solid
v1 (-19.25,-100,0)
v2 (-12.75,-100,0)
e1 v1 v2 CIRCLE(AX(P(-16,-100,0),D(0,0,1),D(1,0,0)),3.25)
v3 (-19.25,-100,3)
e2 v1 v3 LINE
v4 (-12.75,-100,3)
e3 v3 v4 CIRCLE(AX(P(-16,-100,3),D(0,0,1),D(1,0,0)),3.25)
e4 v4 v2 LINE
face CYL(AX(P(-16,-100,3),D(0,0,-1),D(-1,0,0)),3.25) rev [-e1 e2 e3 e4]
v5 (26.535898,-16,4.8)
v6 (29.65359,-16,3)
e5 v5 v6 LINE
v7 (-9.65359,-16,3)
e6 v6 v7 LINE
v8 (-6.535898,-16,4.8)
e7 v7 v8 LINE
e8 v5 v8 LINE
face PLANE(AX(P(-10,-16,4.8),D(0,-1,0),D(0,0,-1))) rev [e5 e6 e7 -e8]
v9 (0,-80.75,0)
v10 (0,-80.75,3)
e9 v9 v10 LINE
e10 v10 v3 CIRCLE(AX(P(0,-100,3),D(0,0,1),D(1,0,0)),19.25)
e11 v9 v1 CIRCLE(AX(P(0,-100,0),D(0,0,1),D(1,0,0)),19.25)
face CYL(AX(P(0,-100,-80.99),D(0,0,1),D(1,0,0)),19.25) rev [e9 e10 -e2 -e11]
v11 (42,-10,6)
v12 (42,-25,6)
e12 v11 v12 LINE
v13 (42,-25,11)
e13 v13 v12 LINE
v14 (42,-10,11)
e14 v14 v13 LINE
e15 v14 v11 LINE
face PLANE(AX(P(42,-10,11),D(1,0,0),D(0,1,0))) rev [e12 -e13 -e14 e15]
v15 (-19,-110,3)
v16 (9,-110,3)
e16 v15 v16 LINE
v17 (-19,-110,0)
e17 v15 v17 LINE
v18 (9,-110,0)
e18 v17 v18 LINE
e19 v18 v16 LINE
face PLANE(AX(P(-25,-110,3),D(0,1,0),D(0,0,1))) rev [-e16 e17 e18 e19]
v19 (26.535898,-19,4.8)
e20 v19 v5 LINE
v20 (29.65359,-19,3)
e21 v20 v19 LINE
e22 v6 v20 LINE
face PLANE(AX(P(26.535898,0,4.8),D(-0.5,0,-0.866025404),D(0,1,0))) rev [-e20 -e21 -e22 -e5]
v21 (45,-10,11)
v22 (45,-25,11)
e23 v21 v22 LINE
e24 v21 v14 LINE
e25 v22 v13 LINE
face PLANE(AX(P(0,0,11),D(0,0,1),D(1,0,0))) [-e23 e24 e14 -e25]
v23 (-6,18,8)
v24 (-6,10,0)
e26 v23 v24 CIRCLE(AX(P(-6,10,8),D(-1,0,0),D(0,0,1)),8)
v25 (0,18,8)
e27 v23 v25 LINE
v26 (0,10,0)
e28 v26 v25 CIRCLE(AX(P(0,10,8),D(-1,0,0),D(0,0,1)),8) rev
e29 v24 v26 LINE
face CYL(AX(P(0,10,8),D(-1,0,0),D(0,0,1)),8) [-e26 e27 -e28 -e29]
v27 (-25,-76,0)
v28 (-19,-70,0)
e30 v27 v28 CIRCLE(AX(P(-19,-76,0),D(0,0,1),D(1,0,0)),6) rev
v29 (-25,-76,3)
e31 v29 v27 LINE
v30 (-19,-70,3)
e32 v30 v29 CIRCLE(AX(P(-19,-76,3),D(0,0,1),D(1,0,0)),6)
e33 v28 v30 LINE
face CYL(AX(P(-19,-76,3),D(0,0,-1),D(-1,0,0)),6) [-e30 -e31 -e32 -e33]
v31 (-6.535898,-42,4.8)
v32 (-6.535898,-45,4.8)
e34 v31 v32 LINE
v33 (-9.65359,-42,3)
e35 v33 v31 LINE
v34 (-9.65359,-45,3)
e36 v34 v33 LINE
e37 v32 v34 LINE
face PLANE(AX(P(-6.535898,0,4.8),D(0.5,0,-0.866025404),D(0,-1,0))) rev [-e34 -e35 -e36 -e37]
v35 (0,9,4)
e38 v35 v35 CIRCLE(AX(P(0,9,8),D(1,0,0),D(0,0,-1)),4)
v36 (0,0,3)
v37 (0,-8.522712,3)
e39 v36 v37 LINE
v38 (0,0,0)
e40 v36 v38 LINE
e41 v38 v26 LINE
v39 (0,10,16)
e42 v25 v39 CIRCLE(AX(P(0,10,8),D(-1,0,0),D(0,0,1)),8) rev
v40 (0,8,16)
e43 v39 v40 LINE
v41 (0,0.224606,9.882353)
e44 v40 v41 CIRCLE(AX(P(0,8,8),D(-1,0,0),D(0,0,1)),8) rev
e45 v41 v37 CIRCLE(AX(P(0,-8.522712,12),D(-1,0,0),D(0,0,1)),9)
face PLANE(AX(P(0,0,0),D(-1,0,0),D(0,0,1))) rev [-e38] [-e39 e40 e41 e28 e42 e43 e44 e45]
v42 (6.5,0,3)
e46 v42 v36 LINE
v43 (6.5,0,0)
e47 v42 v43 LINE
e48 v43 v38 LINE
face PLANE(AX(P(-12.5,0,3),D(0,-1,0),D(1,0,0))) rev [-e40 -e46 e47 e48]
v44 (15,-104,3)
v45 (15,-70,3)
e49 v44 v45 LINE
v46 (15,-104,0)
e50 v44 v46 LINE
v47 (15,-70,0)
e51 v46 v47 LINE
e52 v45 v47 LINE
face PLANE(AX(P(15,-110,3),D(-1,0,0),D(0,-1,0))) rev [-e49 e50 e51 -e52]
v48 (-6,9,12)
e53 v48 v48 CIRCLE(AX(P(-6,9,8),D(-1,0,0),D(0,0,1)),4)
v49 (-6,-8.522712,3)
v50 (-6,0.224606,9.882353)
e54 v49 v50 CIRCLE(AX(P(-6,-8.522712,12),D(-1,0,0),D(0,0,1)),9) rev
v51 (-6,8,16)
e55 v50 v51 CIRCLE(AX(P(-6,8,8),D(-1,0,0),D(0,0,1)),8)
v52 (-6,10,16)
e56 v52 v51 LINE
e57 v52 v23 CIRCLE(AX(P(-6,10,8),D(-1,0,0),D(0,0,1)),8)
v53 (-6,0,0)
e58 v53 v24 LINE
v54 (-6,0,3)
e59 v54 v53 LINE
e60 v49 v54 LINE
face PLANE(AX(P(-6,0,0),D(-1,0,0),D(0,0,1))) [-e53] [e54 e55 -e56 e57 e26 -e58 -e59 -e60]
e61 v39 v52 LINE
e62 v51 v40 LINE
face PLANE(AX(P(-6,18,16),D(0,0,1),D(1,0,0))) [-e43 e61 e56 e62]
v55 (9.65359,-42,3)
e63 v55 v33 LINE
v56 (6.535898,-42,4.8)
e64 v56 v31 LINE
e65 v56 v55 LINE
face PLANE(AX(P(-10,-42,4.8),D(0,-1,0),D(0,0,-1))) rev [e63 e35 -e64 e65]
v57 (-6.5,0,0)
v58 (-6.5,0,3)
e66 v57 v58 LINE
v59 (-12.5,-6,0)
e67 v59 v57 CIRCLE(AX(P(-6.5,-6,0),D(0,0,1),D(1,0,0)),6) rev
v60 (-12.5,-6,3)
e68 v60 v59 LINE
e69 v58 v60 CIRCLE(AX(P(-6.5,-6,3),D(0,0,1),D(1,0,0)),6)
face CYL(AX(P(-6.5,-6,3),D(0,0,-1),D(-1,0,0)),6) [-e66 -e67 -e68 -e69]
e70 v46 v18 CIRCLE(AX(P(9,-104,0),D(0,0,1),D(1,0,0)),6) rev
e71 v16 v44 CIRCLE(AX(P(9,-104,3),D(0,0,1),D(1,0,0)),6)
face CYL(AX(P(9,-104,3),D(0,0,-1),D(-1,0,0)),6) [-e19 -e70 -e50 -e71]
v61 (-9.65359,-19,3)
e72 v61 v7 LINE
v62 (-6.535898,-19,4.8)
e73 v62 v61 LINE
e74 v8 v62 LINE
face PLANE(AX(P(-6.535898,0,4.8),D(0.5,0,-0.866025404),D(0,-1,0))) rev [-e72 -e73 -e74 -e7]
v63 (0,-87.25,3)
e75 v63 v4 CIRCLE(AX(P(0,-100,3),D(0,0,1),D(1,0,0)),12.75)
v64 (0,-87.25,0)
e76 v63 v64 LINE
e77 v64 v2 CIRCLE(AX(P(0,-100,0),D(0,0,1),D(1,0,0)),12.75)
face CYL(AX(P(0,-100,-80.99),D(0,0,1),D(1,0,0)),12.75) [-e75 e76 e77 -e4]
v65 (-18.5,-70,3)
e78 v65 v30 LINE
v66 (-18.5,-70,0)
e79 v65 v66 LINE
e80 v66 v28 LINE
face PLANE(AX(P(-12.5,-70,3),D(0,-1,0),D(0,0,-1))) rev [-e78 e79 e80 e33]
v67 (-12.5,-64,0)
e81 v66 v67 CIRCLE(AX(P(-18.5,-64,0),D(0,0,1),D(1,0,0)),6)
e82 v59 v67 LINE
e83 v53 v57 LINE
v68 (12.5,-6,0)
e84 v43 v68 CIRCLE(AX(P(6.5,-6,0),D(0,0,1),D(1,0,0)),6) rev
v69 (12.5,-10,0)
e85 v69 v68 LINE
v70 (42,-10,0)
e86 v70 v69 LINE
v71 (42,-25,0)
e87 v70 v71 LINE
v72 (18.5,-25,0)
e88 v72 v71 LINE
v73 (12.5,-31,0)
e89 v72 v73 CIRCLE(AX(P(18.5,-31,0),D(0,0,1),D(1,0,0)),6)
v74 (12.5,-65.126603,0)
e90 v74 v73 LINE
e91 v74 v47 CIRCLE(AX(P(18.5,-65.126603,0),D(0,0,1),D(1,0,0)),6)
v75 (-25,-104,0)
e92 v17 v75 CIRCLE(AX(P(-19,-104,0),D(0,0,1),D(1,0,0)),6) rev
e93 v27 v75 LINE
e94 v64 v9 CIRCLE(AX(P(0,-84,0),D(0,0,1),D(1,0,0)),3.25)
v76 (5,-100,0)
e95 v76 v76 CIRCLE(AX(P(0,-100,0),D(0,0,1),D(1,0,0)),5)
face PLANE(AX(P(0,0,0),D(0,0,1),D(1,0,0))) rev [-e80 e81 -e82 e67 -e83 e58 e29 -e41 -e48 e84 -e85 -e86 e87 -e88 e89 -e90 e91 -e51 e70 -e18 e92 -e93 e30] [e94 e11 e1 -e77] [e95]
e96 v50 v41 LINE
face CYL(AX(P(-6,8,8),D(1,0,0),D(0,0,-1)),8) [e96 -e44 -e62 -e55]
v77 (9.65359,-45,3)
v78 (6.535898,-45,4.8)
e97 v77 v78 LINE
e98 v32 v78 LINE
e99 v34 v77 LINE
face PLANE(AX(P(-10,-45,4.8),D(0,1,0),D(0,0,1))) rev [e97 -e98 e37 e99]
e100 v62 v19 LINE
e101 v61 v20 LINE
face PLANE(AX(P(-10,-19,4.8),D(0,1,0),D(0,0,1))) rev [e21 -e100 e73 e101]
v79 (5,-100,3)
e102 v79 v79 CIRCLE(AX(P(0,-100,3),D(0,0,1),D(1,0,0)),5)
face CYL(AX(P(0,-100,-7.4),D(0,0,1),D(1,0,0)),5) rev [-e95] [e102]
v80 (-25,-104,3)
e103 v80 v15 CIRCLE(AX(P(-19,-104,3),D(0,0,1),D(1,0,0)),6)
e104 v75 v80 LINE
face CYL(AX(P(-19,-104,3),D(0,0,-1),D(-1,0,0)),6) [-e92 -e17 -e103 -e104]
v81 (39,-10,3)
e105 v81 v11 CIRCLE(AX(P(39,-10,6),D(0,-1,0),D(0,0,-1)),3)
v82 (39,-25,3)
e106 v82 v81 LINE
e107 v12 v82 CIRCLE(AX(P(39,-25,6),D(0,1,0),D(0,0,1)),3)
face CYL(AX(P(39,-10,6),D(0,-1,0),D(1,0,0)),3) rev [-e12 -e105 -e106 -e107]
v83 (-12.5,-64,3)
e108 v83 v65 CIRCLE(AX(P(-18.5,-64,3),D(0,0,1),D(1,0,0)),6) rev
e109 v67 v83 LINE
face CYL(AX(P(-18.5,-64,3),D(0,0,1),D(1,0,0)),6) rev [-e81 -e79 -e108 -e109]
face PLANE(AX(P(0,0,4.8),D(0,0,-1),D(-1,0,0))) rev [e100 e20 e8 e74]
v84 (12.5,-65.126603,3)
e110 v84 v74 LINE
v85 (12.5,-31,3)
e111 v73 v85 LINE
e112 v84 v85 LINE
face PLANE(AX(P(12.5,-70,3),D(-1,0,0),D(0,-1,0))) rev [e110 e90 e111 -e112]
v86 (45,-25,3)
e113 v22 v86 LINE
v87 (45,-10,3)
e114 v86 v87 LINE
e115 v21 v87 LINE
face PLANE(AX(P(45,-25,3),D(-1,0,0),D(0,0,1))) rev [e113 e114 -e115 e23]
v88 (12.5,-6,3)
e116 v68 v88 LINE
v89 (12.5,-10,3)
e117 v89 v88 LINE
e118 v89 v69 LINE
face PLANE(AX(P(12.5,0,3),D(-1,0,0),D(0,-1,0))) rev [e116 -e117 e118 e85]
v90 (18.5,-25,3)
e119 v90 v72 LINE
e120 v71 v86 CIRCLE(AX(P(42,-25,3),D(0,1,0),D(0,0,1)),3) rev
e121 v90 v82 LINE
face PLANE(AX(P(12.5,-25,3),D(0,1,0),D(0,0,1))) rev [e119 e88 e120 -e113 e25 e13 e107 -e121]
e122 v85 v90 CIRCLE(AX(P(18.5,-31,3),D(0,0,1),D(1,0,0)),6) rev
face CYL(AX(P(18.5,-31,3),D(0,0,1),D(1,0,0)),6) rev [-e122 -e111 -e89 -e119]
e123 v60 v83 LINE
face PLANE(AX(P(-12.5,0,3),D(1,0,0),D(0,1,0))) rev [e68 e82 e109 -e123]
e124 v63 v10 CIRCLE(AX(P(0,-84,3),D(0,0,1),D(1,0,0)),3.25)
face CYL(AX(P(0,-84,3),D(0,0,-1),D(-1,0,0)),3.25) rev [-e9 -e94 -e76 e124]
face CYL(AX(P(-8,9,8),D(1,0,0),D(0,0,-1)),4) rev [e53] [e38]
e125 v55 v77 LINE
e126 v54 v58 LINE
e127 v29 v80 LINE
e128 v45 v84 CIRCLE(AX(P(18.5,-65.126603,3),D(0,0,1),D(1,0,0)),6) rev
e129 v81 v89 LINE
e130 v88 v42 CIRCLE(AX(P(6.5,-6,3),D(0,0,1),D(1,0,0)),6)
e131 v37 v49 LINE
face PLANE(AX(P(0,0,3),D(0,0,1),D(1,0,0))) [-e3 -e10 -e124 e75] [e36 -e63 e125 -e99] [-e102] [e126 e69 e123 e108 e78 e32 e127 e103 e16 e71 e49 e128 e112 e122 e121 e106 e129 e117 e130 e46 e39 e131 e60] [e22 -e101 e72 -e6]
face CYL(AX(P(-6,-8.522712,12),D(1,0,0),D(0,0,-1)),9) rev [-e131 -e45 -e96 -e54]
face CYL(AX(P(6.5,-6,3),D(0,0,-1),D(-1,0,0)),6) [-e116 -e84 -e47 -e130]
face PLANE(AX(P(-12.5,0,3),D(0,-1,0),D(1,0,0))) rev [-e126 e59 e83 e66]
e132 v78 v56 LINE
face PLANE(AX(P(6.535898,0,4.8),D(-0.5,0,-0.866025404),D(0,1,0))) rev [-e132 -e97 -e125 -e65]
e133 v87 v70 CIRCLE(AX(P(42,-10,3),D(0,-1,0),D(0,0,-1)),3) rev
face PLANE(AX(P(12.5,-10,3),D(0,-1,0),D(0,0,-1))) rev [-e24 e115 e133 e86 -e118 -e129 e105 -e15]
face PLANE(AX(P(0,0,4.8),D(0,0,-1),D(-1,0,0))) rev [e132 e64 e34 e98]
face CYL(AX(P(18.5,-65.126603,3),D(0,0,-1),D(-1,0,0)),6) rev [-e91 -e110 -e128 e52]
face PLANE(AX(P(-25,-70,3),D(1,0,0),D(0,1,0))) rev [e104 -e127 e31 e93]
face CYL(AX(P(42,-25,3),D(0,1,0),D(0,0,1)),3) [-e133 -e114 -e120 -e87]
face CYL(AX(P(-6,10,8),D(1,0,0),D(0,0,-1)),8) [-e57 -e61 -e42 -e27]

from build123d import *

# Parameters (mm, degrees)
BOSS_EXTRUDE1_DEPTH = 3
SKETCH4_R           = 5
CUT_EXTRUDE1_DEPTH  = 10.4
SKETCH7_W           = 6.5
SKETCH7_H           = 3
CUT_REVOLVE1_ANGLE  = 90
SKETCH8_R           = 3.25
CUT_EXTRUDE2_DEPTH  = 119.886500495
SKETCH9_W           = 16
SKETCH9_H           = 18
BOSS_EXTRUDE2_DEPTH = 6
SKETCH10_R          = 4
CUT_EXTRUDE3_DEPTH  = 8
FILLET1_R           = 8
FILLET2_R           = 9
SKETCH11_W          = 3
SKETCH11_H          = 15
BOSS_EXTRUDE3_DEPTH = 8
FILLET3_R           = 3
FILLET4_R           = 6
SKETCH12_W          = 40
SKETCH12_H          = 3
SKETCH12_W_2        = 20
BOSS_EXTRUDE4_DEPTH = 1.8
CHAMFER1_SIZE       = 2
CHAMFER1_SIZE_2     = 3.464101615


# Some blends are built 0.0001 mm under size
with BuildPart() as part:
    # Sketch1 → Boss-Extrude1 (new body)
    with BuildSketch(Plane.XY):
        Polygon((-12.5, 0), (-12.5, -70), (-25, -70), (-25, -110), (15, -110), (15, -70), (12.5, -70), (12.5, -25), (45, -25), (45, -10), (12.5, -10), (12.5, 0), (0, 0), align=None)
    extrude(amount=BOSS_EXTRUDE1_DEPTH)

    # Sketch4 → Cut-Extrude1 (cut)
    with BuildSketch(Plane.XY.offset(3)):
        with Locations((0, -100)):
            Circle(SKETCH4_R)
    extrude(amount=-CUT_EXTRUDE1_DEPTH, mode=Mode.SUBTRACT)

    # Sketch7 → Cut-Revolve1 (revolve, cut)
    with BuildSketch(Plane(origin=(0, -100, 0), x_dir=(1, 0, 0), z_dir=(0, 1, 0))):
        with Locations((-16, -1.5)):
            Rectangle(SKETCH7_W, SKETCH7_H)
    revolve(axis=Axis((0, -100, -80.99), (0, 0, -1)), revolution_arc=CUT_REVOLVE1_ANGLE, mode=Mode.SUBTRACT)

    # Sketch8 → Cut-Extrude2 (cut, through all)
    with BuildSketch(Plane.XY):
        with Locations((0, -84)):
            Circle(SKETCH8_R)
        with Locations((-16, -100)):
            Circle(SKETCH8_R)
    extrude(amount=CUT_EXTRUDE2_DEPTH, mode=Mode.SUBTRACT)

    # Sketch9 → Boss-Extrude2 (add)
    with BuildSketch(Plane(origin=(0, 0, 0), x_dir=(0, 0, -1), z_dir=(1, 0, 0))):
        with Locations((-8, 9)):
            Rectangle(SKETCH9_W, SKETCH9_H)
    extrude(amount=-BOSS_EXTRUDE2_DEPTH)

    # Sketch10 → Cut-Extrude3 (cut)
    with BuildSketch(Plane(origin=(0, 0, 0), x_dir=(0, 0, -1), z_dir=(1, 0, 0))):
        with Locations((-8, 9)):
            Circle(SKETCH10_R)
    extrude(amount=-CUT_EXTRUDE3_DEPTH, mode=Mode.SUBTRACT)

    # Fillet1
    fillet1_edges = [part.edges().sort_by_distance(p)[0] for p in [
        (-3, 0, 16),
        (-3, 18, 0),
        (-3, 18, 16),
    ]]
    fillet(fillet1_edges, radius=FILLET1_R - 0.0001)  # a hair under: the kernel refuses the full size

    # Fillet2
    # the kernel refuses this fillet: 9 mm, written as the material it adds along each edge
    with BuildSketch(Plane(origin=(-6, 0, 3), x_dir=(0, 0.032615873538584784, 0.9994679608638364), z_dir=(1, 0, 0))) as fillet2_piece_1:
        with BuildLine():
            CenterArc((8.717235267, 8.811741396), FILLET2_R, 181.869083386, 76.391304548)
            Line((-0.27797638, 8.518198535), (-1.177497545, 8.488844248))
            Line((-1.177497545, 8.488844248), (-0.899521165, -0.029354286))
            Line((-0.899521165, -0.029354286), (0.029354286, -0.899521165))
            ThreePointArc((0.029354286, -0.899521165), (5.026794037, -0.736438535), (6.702939259, -0.88117414))
            Line((6.702939259, -0.88117414), (6.886057078, 0))
        make_face()
    extrude(amount=6)

    # Sketch11 → Boss-Extrude3 (add)
    with BuildSketch(Plane.XY.offset(3)):
        with Locations((43.5, -17.5)):
            Rectangle(SKETCH11_W, SKETCH11_H)
    extrude(amount=BOSS_EXTRUDE3_DEPTH)

    # Fillet3
    fillet3_edges = [part.edges().sort_by_distance(p)[0] for p in [
        (42, -17.5, 3),
        (45, -17.5, 0),
    ]]
    fillet(fillet3_edges, radius=FILLET3_R)

    # Fillet4
    # the kernel refuses this fillet: 6 mm, written as the material it adds along each edge
    with BuildSketch(Plane(origin=(12.5, -25, 0), x_dir=(1, 0, 0), z_dir=(0, 0, 1))) as fillet4_piece_1:
        with BuildLine():
            CenterArc((FILLET4_R, -FILLET4_R), FILLET4_R, 90, 90)
            Line((0, -FILLET4_R), (0, 0))
            Line((0, 0), (FILLET4_R, 0))
        make_face()
    extrude(amount=3)
    with BuildSketch(Plane(origin=(12.5, -70, 0), x_dir=(0, 1, 0), z_dir=(0, 0, 1))) as fillet4_piece_2:
        with BuildLine():
            CenterArc((4.873397172, -6), FILLET4_R, 90, 54.314665287)
            Line((0, -2.5), (0, 0))
            Line((0, 0), (4.873397172, 0))
        make_face()
    extrude(amount=3)
    with BuildSketch(Plane(origin=(-12.5, -70, 0), x_dir=(0, 1, 0), z_dir=(0, 0, 1))) as fillet4_piece_3:
        with BuildLine():
            CenterArc((FILLET4_R, FILLET4_R), FILLET4_R, 180, 90)
            Line((0, FILLET4_R), (0, 0))
            Line((0, 0), (FILLET4_R, 0))
        make_face()
    extrude(amount=3)
    # the kernel refuses this fillet: 6 mm, written as the material it takes off along each edge
    with BuildSketch(Plane(origin=(15, -110, -15), x_dir=(0, 1, 0), z_dir=(0, 0, 1)), Plane(origin=(-25, -110, -15), x_dir=(1, 0, 0), z_dir=(0, 0, 1)), Plane(origin=(-25, -70, -15), x_dir=(0, -1, 0), z_dir=(0, 0, 1))) as fillet4_2_piece_1:
        with BuildLine():
            CenterArc((FILLET4_R, FILLET4_R), FILLET4_R, 180, 90)
            Line((0, FILLET4_R), (0, 0))
            Line((0, 0), (FILLET4_R, 0))
        make_face()
    extrude(amount=33, mode=Mode.SUBTRACT)
    with BuildSketch(Plane(origin=(-12.5, 0, -15), x_dir=(1, 0, 0), z_dir=(0, 0, 1)), Plane(origin=(12.5, 0, -15), x_dir=(0, -1, 0), z_dir=(0, 0, 1))) as fillet4_2_piece_2:
        with BuildLine():
            CenterArc((FILLET4_R, -FILLET4_R), FILLET4_R, 90, 90)
            Line((0, -FILLET4_R), (0, 0))
            Line((0, 0), (FILLET4_R, 0))
        make_face()
    extrude(amount=33, mode=Mode.SUBTRACT)

    # Sketch12 → Boss-Extrude4 (add)
    with BuildSketch(Plane.XY.offset(3)):
        with Locations((10, -17.5)):
            Rectangle(SKETCH12_W, SKETCH12_H)
        with Locations((0, -43.5)):
            Rectangle(SKETCH12_W_2, SKETCH12_H)
    extrude(amount=BOSS_EXTRUDE4_DEPTH)

    # Chamfer1
    # the kernel refuses this chamfer: 3.464101615, 2 mm, written as the material it takes off along each edge
    with BuildSketch(Plane(origin=(10, -53.961927941, 4.8), x_dir=(0, 0, -1), z_dir=(0, 1, 0))) as chamfer1_piece_1_section:
        Polygon((CHAMFER1_SIZE, 0), (0, CHAMFER1_SIZE_2), (0, 0), align=None)
    chamfer1_piece_1 = extrude(amount=20.923855882, mode=Mode.PRIVATE)
    chamfer1_piece_1 = split(chamfer1_piece_1, bisect_by=Plane(origin=(10, -53.961927941, 3), z_dir=(0, 0, 1)), keep=Keep.TOP, mode=Mode.PRIVATE)
    add(chamfer1_piece_1, mode=Mode.SUBTRACT)
    with BuildSketch(Plane(origin=(-10, -33.038072059, 4.8), x_dir=(0, 0, -1), z_dir=(0, -1, 0))) as chamfer1_piece_2_section:
        Polygon((CHAMFER1_SIZE, 0), (0, CHAMFER1_SIZE_2), (0, 0), align=None)
    chamfer1_piece_2 = extrude(amount=20.923855882, mode=Mode.PRIVATE)
    chamfer1_piece_2 = split(chamfer1_piece_2, bisect_by=Plane(origin=(-10, -33.038072059, 3), z_dir=(0, 0, 1)), keep=Keep.TOP, mode=Mode.PRIVATE)
    add(chamfer1_piece_2, mode=Mode.SUBTRACT)
    with BuildSketch(Plane(origin=(-10, -7.038072059, 4.8), x_dir=(0, 0, -1), z_dir=(0, -1, 0))) as chamfer1_piece_3_section:
        Polygon((CHAMFER1_SIZE, 0), (0, CHAMFER1_SIZE_2), (0, 0), align=None)
    chamfer1_piece_3 = extrude(amount=20.923855882, mode=Mode.PRIVATE)
    chamfer1_piece_3 = split(chamfer1_piece_3, bisect_by=Plane(origin=(-10, -7.038072059, 3), z_dir=(0, 0, 1)), keep=Keep.TOP, mode=Mode.PRIVATE)
    add(chamfer1_piece_3, mode=Mode.SUBTRACT)
    with BuildSketch(Plane(origin=(30, -27.961927941, 4.8), x_dir=(0, 0, -1), z_dir=(0, 1, 0))) as chamfer1_piece_4_section:
        Polygon((CHAMFER1_SIZE, 0), (0, CHAMFER1_SIZE_2), (0, 0), align=None)
    chamfer1_piece_4 = extrude(amount=20.923855882, mode=Mode.PRIVATE)
    chamfer1_piece_4 = split(chamfer1_piece_4, bisect_by=Plane(origin=(30, -27.961927941, 3), z_dir=(0, 0, 1)), keep=Keep.TOP, mode=Mode.PRIVATE)
    add(chamfer1_piece_4, mode=Mode.SUBTRACT)


solid = part.part
